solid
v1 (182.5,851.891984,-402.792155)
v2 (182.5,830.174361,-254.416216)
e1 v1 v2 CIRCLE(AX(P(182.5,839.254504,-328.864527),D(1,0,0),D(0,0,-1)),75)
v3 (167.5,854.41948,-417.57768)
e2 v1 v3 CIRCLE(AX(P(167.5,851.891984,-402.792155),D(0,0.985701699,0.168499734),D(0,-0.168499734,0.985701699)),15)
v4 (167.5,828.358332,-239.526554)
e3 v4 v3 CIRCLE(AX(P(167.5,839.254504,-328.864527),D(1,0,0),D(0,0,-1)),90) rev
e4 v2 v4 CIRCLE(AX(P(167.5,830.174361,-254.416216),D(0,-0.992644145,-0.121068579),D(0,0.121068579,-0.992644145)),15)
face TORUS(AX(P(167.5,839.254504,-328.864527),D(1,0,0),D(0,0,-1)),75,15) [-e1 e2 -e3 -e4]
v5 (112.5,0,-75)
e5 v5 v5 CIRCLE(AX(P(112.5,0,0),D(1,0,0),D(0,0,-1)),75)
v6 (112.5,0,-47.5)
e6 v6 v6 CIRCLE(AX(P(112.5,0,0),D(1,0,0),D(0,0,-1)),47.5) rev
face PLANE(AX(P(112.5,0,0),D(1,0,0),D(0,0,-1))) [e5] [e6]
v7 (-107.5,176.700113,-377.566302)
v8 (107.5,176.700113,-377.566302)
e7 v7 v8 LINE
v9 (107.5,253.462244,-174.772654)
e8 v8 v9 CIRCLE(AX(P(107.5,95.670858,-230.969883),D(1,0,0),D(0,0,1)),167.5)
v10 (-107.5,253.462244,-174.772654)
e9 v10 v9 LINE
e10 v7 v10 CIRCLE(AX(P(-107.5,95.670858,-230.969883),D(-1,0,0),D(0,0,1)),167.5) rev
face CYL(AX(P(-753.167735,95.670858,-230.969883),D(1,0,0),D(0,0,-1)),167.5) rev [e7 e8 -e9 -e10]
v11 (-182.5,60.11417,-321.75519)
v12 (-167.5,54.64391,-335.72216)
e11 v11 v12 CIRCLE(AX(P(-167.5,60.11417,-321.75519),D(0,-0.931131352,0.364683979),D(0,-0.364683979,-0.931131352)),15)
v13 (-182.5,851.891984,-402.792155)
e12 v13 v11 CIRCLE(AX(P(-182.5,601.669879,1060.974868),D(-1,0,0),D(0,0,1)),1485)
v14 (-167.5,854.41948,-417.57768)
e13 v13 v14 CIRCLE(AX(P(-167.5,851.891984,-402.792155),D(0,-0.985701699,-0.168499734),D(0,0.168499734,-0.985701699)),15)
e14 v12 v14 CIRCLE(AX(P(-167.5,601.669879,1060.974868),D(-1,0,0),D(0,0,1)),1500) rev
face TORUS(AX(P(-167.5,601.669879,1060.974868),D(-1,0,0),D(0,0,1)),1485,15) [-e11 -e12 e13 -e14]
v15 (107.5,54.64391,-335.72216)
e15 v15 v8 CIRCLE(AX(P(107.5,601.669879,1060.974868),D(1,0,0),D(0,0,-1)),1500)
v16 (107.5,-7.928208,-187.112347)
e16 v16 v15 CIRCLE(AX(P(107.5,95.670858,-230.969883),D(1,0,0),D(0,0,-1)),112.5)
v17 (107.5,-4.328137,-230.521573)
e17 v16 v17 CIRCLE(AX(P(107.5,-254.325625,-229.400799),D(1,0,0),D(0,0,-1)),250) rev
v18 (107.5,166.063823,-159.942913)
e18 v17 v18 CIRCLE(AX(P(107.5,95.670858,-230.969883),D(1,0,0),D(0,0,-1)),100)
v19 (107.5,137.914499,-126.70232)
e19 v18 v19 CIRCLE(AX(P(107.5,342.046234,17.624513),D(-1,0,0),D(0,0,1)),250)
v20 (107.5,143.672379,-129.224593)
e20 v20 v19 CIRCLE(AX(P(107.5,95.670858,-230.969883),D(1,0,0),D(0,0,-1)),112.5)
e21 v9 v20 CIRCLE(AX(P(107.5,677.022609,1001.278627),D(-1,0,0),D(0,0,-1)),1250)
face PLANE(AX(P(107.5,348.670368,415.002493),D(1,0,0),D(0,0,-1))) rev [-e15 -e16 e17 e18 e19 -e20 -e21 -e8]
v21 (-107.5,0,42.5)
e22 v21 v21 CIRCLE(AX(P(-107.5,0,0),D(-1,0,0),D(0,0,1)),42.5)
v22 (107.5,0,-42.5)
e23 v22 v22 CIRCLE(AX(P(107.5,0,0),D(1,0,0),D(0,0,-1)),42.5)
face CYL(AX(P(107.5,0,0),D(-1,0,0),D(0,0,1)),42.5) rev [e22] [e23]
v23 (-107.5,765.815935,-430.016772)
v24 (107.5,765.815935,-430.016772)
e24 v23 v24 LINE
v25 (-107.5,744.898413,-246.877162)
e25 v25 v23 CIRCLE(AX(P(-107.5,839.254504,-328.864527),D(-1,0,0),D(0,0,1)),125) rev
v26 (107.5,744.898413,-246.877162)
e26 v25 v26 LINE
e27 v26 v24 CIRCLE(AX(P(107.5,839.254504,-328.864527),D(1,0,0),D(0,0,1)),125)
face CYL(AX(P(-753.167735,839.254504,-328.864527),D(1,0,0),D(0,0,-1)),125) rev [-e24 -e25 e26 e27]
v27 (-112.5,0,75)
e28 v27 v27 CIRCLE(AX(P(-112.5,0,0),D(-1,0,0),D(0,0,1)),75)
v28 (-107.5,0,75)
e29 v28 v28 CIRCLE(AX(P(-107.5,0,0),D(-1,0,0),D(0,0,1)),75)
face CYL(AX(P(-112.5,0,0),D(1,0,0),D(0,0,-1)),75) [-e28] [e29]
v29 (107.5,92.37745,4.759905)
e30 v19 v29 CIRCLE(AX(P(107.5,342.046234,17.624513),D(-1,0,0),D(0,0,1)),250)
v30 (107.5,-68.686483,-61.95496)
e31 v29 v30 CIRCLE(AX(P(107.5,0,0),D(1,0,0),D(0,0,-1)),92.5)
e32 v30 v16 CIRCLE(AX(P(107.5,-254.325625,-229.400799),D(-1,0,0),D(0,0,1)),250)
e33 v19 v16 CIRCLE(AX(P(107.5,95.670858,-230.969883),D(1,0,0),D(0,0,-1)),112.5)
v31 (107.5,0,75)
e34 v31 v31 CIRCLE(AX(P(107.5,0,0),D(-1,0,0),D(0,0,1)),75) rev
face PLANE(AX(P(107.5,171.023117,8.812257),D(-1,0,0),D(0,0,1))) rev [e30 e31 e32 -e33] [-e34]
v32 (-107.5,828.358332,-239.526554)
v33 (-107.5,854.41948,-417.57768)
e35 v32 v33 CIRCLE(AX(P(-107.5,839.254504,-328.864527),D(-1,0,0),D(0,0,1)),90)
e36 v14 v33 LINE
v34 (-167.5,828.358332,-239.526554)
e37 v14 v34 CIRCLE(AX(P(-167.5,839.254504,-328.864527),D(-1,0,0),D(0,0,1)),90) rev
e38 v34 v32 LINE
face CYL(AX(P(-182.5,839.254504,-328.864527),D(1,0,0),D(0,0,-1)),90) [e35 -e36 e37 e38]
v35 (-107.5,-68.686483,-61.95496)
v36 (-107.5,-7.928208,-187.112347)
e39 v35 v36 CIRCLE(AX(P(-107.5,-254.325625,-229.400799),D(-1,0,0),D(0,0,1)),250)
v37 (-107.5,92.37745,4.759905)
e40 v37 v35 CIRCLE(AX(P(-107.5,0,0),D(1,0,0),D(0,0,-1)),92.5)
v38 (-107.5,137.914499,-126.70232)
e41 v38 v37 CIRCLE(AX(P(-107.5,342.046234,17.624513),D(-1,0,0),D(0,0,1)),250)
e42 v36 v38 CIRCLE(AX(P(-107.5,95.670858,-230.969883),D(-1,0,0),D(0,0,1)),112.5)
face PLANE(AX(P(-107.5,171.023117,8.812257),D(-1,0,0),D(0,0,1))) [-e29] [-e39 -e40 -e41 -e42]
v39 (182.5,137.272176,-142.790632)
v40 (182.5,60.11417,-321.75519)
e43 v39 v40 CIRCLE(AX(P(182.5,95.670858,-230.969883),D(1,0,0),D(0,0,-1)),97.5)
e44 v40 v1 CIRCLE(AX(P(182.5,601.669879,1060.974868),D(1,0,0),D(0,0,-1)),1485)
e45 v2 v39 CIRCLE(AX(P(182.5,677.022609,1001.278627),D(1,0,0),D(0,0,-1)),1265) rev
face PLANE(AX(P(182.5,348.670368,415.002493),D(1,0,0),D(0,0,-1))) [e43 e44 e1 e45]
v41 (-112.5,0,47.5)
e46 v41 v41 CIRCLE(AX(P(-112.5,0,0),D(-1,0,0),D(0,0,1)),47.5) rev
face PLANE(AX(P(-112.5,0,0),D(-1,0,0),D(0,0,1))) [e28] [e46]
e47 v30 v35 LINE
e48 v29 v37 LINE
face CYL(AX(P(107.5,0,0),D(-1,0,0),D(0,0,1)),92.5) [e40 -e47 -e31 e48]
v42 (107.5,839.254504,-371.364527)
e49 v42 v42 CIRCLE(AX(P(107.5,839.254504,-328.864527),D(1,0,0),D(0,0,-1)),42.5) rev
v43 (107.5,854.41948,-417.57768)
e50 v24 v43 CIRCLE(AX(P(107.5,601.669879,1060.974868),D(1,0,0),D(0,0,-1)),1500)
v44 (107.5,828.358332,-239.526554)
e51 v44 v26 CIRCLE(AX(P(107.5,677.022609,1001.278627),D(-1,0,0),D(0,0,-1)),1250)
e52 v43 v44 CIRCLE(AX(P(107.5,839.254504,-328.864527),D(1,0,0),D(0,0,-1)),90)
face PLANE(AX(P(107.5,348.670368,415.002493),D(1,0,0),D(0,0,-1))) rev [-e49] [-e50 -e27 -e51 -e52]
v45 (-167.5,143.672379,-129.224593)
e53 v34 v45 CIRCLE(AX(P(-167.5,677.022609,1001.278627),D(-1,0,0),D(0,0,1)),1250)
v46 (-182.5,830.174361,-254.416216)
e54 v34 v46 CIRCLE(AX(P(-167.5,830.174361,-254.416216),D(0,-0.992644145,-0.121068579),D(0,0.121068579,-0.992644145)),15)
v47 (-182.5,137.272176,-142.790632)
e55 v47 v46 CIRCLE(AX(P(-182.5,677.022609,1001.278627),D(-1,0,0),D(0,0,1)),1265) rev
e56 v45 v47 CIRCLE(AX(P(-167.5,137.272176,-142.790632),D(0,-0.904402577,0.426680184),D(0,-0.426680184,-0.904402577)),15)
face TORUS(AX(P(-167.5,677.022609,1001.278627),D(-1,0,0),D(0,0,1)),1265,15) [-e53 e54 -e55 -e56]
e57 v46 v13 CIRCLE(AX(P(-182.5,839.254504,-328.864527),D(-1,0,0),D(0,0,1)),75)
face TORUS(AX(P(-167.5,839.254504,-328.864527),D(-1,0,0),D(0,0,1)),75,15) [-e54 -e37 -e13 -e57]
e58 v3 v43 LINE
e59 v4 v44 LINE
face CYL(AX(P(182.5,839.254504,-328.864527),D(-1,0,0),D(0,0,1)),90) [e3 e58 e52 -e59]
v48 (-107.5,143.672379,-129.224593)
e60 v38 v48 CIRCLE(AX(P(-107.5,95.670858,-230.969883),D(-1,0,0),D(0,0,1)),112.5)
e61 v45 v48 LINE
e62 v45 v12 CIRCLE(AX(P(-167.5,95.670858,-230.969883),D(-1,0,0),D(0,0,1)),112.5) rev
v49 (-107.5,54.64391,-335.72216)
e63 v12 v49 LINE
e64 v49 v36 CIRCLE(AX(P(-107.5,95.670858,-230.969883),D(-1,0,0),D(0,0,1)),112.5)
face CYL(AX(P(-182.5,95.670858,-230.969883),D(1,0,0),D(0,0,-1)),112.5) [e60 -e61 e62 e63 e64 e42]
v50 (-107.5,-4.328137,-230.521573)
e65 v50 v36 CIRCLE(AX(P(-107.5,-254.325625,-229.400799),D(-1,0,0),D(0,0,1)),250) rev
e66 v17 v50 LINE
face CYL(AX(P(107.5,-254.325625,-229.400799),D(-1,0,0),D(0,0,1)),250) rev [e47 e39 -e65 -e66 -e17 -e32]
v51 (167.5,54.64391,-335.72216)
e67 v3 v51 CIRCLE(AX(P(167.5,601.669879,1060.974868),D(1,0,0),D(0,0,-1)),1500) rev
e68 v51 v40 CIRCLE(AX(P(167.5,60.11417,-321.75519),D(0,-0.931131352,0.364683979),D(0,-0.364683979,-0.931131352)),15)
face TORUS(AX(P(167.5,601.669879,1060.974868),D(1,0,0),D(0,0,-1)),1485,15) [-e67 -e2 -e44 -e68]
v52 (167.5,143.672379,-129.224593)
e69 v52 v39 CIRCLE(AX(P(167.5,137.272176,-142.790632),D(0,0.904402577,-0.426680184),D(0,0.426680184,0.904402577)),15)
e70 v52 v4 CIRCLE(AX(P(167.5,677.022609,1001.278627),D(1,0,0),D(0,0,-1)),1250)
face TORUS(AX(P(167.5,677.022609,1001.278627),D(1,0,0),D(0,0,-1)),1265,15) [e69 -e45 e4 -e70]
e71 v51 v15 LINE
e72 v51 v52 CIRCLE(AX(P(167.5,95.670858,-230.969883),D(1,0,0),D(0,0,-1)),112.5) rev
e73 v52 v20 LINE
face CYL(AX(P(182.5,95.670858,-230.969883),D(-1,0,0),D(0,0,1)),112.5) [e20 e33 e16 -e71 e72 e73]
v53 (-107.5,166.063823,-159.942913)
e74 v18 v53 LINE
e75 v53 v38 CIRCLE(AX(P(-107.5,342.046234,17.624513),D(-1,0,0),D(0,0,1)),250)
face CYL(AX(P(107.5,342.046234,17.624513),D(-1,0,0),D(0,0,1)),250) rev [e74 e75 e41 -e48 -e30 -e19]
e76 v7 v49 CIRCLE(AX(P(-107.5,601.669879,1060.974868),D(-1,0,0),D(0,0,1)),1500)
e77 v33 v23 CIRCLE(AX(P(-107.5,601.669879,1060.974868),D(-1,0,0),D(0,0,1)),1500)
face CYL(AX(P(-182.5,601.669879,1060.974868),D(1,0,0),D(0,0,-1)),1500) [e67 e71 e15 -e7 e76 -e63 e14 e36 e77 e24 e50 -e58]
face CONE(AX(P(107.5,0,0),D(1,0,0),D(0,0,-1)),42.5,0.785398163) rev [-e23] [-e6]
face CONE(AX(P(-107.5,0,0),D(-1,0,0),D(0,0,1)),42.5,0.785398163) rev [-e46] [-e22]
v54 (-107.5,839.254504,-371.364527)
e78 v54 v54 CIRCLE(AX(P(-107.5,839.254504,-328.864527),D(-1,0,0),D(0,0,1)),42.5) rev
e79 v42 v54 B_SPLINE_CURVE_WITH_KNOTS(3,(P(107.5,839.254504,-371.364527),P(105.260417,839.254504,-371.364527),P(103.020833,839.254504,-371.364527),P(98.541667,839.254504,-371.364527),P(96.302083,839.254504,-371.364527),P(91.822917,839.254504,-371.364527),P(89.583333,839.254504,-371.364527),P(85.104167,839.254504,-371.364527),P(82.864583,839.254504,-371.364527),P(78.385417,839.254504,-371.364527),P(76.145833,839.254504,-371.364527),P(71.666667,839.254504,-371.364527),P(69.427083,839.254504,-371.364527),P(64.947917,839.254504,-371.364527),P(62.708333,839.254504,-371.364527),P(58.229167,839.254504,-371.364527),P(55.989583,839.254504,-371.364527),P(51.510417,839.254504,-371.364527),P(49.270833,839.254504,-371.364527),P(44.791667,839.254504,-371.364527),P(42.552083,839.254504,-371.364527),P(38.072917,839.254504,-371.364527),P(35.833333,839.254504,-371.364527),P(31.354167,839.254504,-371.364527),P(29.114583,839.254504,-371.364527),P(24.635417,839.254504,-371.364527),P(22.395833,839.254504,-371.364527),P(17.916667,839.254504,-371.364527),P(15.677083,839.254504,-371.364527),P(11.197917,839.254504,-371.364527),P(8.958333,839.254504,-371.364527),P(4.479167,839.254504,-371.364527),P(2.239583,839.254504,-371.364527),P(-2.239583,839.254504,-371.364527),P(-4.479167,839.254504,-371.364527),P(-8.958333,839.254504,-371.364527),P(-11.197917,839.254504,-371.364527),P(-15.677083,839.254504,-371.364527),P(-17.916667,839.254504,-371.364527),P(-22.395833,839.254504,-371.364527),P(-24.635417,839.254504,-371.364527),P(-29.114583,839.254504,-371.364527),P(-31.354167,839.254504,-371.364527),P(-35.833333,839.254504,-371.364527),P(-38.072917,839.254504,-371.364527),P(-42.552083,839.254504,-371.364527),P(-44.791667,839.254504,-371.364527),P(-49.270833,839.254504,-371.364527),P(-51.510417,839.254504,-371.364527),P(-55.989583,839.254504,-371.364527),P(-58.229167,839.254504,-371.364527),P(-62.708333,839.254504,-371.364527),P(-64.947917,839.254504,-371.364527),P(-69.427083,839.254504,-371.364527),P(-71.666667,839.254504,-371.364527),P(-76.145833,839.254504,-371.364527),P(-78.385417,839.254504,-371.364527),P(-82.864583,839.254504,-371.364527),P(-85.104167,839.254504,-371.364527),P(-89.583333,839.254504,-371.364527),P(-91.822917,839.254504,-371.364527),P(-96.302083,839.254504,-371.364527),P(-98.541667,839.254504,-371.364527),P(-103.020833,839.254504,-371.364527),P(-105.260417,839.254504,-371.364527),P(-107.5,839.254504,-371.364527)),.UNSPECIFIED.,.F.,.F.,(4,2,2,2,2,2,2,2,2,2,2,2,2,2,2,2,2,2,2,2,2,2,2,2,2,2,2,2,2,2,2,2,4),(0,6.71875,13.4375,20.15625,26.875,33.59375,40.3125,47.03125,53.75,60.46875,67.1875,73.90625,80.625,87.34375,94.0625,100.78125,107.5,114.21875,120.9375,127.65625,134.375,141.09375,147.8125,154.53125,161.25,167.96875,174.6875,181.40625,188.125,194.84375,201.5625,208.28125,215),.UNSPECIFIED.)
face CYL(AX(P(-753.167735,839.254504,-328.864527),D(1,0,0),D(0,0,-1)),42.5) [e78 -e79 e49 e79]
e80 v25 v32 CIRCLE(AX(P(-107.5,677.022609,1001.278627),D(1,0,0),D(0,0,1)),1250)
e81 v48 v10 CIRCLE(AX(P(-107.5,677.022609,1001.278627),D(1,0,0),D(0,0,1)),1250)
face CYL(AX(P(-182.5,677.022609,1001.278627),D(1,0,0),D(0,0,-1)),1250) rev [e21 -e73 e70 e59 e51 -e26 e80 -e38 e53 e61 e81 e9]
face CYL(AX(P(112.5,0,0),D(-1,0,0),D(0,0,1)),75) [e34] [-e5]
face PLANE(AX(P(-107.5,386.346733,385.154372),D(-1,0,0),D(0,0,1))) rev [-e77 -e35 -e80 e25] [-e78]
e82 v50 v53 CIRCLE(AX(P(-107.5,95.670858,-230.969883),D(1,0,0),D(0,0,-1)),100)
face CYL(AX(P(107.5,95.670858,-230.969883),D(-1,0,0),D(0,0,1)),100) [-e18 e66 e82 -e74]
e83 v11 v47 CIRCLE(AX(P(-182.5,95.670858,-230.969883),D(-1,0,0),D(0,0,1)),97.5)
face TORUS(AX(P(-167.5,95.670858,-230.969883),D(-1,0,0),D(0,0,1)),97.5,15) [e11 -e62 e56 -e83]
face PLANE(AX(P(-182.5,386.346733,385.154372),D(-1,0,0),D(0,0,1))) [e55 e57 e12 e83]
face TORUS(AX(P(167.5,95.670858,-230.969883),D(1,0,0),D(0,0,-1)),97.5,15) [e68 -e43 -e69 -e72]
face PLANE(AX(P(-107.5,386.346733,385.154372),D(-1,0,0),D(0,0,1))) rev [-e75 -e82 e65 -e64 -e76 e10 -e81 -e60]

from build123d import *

# Parameters (mm, degrees)
SKETCH1_R           = 42.5
BOSS_EXTRUDE1_DEPTH = 107.5
SKETCH2_R           = 75
SKETCH2_R_2         = 42.5
BOSS_EXTRUDE2_DEPTH = 5
BOSS_EXTRUDE3_START = 5
SKETCH3_R           = 75
SKETCH3_R_2         = 42.5
BOSS_EXTRUDE3_DEPTH = 5
CHAMFER1_SIZE       = 5
BOSS_EXTRUDE4_DEPTH = 75
BOSS_EXTRUDE5_START = 75
BOSS_EXTRUDE5_DEPTH = 75
FILLET2_R           = 15
SKETCH7_R           = 42.5
BOSS_EXTRUDE6_DEPTH = 215


with BuildPart() as part:
    # Sketch1 → Boss-Extrude1 (new, symmetric)
    with BuildSketch(Plane(origin=(0, 0, 0), x_dir=(0, 0, -1), z_dir=(1, 0, 0))):
        with BuildLine():
            ThreePointArc((-4.759905033, 92.377450193), (-85.458856757, -35.398217494), (61.954960333, -68.686482587))
            ThreePointArc((61.954960333, -68.686482587), (140.229582164, -20.76943431), (230.521573397, -4.328136996))
            ThreePointArc((230.521573397, -4.328136996), (323.357836379, 133.939201328), (159.94291274, 166.063822779))
            ThreePointArc((159.94291274, 166.063822779), (84.471080629, 113.843496313), (-4.759905033, 92.377450193))
        make_face()
        Circle(SKETCH1_R, mode=Mode.SUBTRACT)
    extrude(amount=BOSS_EXTRUDE1_DEPTH, both=True)

    # Sketch2 → Boss-Extrude2 (add)
    with BuildSketch(Plane(origin=(107.5, 0, 0), x_dir=(0, 0, -1), z_dir=(1, 0, 0))):
        with Locations(Location((0, 0, 0), (0, 0, 180))):
            Circle(SKETCH2_R)
        Circle(SKETCH2_R_2, mode=Mode.SUBTRACT)
    extrude(amount=BOSS_EXTRUDE2_DEPTH)

    # Sketch3 → Boss-Extrude3 (add)
    with BuildSketch(Plane.ZY.offset(107.5).offset(BOSS_EXTRUDE3_START)):
        Circle(SKETCH3_R)
        Circle(SKETCH3_R_2, mode=Mode.SUBTRACT)
    extrude(amount=-BOSS_EXTRUDE3_DEPTH)

    # Chamfer1
    # the kernel refuses this chamfer: 5 mm, written as the material it takes off along each edge
    with BuildSketch(Plane(origin=(112.5, 0, 0), x_dir=(0, 0, -1), z_dir=(0, -1, 0))) as chamfer1_piece_1:
        Polygon((42.5 + CHAMFER1_SIZE, 0), (42.5, -CHAMFER1_SIZE), (42.5, 0), align=None)
    revolve(axis=Axis((112.5, 0, 0), (1, 0, 0)), mode=Mode.SUBTRACT)
    with BuildSketch(Plane(origin=(-112.5, 0, 0), x_dir=(0, 0, 1), z_dir=(0, -1, 0))) as chamfer1_piece_2:
        Polygon((42.5 + CHAMFER1_SIZE, 0), (42.5, -CHAMFER1_SIZE), (42.5, 0), align=None)
    revolve(axis=Axis((-112.5, 0, 0), (-1, 0, 0)), mode=Mode.SUBTRACT)

    # Sketch5 → Boss-Extrude4 (add)
    with BuildSketch(Plane.ZY.offset(107.5)):
        with BuildLine():
            ThreePointArc((-335.722160279, 54.643910463), (-186.43026552, -7.636801177), (-129.224593262, 143.672378798))
            ThreePointArc((-129.224593262, 143.672378798), (-232.809942482, 478.212645548), (-239.526554212, 828.358332052))
            ThreePointArc((-239.526554212, 828.358332052), (-315.830208714, 928.305649758), (-417.57768021, 854.419480204))
            ThreePointArc((-417.57768021, 854.419480204), (-431.229967878, 448.945530482), (-335.722160279, 54.643910463))
        make_face()
    extrude(amount=BOSS_EXTRUDE4_DEPTH)

    # Sketch6 → Boss-Extrude5 (add)
    with BuildSketch(Plane(origin=(107.5, 0, 0), x_dir=(0, 0, -1), z_dir=(1, 0, 0)).offset(BOSS_EXTRUDE5_START)):
        with BuildLine():
            ThreePointArc((129.224593262, 143.672378798), (232.809942482, 478.212645548), (239.526554212, 828.358332052))
            ThreePointArc((239.526554212, 828.358332052), (315.830208714, 928.305649758), (417.57768021, 854.419480204))
            ThreePointArc((417.57768021, 854.419480204), (431.229967878, 448.945530482), (335.722160279, 54.643910463))
            ThreePointArc((335.722160279, 54.643910463), (186.43026552, -7.636801177), (129.224593262, 143.672378798))
        make_face()
    extrude(amount=-BOSS_EXTRUDE5_DEPTH)

    # Fillet2
    fillet2_edges = [part.edges().sort_by_distance(p)[0] for p in [
        (-182.5, 478.212645548, -232.809942482),
        (-182.5, 928.305649758, -315.830208714),
        (-182.5, 448.945530482, -431.229967878),
        (-182.5, -7.636801177, -186.43026552),
        (182.5, -7.636801177, -186.43026552),
        (182.5, 448.945530482, -431.229967878),
        (182.5, 928.305649758, -315.830208714),
        (182.5, 478.212645548, -232.809942482),
    ]]
    fillet(fillet2_edges, radius=FILLET2_R)

    # Sketch7 → Boss-Extrude6 (add)
    with BuildSketch(Plane.ZY.offset(-107.5)):
        with Locations(Location((-328.864527293, 839.254504122, 0), (0, 0, 180))):
            Circle(SKETCH7_R)
        with BuildLine():
            ThreePointArc((-430.016772116, 765.815935458), (-433.115150694, 468.647268594), (-377.566301605, 176.700112622))
            ThreePointArc((-377.566301605, 176.700112622), (-290.266675416, 252.323787921), (-174.772654288, 253.462244012))
            ThreePointArc((-174.772654288, 253.462244012), (-235.480184212, 495.562856506), (-246.877162179, 744.898412841))
            ThreePointArc((-246.877162179, 744.898412841), (-343.049337537, 715.061947347), (-430.016772116, 765.815935458))
        make_face()
    extrude(amount=BOSS_EXTRUDE6_DEPTH)


solid = part.part
